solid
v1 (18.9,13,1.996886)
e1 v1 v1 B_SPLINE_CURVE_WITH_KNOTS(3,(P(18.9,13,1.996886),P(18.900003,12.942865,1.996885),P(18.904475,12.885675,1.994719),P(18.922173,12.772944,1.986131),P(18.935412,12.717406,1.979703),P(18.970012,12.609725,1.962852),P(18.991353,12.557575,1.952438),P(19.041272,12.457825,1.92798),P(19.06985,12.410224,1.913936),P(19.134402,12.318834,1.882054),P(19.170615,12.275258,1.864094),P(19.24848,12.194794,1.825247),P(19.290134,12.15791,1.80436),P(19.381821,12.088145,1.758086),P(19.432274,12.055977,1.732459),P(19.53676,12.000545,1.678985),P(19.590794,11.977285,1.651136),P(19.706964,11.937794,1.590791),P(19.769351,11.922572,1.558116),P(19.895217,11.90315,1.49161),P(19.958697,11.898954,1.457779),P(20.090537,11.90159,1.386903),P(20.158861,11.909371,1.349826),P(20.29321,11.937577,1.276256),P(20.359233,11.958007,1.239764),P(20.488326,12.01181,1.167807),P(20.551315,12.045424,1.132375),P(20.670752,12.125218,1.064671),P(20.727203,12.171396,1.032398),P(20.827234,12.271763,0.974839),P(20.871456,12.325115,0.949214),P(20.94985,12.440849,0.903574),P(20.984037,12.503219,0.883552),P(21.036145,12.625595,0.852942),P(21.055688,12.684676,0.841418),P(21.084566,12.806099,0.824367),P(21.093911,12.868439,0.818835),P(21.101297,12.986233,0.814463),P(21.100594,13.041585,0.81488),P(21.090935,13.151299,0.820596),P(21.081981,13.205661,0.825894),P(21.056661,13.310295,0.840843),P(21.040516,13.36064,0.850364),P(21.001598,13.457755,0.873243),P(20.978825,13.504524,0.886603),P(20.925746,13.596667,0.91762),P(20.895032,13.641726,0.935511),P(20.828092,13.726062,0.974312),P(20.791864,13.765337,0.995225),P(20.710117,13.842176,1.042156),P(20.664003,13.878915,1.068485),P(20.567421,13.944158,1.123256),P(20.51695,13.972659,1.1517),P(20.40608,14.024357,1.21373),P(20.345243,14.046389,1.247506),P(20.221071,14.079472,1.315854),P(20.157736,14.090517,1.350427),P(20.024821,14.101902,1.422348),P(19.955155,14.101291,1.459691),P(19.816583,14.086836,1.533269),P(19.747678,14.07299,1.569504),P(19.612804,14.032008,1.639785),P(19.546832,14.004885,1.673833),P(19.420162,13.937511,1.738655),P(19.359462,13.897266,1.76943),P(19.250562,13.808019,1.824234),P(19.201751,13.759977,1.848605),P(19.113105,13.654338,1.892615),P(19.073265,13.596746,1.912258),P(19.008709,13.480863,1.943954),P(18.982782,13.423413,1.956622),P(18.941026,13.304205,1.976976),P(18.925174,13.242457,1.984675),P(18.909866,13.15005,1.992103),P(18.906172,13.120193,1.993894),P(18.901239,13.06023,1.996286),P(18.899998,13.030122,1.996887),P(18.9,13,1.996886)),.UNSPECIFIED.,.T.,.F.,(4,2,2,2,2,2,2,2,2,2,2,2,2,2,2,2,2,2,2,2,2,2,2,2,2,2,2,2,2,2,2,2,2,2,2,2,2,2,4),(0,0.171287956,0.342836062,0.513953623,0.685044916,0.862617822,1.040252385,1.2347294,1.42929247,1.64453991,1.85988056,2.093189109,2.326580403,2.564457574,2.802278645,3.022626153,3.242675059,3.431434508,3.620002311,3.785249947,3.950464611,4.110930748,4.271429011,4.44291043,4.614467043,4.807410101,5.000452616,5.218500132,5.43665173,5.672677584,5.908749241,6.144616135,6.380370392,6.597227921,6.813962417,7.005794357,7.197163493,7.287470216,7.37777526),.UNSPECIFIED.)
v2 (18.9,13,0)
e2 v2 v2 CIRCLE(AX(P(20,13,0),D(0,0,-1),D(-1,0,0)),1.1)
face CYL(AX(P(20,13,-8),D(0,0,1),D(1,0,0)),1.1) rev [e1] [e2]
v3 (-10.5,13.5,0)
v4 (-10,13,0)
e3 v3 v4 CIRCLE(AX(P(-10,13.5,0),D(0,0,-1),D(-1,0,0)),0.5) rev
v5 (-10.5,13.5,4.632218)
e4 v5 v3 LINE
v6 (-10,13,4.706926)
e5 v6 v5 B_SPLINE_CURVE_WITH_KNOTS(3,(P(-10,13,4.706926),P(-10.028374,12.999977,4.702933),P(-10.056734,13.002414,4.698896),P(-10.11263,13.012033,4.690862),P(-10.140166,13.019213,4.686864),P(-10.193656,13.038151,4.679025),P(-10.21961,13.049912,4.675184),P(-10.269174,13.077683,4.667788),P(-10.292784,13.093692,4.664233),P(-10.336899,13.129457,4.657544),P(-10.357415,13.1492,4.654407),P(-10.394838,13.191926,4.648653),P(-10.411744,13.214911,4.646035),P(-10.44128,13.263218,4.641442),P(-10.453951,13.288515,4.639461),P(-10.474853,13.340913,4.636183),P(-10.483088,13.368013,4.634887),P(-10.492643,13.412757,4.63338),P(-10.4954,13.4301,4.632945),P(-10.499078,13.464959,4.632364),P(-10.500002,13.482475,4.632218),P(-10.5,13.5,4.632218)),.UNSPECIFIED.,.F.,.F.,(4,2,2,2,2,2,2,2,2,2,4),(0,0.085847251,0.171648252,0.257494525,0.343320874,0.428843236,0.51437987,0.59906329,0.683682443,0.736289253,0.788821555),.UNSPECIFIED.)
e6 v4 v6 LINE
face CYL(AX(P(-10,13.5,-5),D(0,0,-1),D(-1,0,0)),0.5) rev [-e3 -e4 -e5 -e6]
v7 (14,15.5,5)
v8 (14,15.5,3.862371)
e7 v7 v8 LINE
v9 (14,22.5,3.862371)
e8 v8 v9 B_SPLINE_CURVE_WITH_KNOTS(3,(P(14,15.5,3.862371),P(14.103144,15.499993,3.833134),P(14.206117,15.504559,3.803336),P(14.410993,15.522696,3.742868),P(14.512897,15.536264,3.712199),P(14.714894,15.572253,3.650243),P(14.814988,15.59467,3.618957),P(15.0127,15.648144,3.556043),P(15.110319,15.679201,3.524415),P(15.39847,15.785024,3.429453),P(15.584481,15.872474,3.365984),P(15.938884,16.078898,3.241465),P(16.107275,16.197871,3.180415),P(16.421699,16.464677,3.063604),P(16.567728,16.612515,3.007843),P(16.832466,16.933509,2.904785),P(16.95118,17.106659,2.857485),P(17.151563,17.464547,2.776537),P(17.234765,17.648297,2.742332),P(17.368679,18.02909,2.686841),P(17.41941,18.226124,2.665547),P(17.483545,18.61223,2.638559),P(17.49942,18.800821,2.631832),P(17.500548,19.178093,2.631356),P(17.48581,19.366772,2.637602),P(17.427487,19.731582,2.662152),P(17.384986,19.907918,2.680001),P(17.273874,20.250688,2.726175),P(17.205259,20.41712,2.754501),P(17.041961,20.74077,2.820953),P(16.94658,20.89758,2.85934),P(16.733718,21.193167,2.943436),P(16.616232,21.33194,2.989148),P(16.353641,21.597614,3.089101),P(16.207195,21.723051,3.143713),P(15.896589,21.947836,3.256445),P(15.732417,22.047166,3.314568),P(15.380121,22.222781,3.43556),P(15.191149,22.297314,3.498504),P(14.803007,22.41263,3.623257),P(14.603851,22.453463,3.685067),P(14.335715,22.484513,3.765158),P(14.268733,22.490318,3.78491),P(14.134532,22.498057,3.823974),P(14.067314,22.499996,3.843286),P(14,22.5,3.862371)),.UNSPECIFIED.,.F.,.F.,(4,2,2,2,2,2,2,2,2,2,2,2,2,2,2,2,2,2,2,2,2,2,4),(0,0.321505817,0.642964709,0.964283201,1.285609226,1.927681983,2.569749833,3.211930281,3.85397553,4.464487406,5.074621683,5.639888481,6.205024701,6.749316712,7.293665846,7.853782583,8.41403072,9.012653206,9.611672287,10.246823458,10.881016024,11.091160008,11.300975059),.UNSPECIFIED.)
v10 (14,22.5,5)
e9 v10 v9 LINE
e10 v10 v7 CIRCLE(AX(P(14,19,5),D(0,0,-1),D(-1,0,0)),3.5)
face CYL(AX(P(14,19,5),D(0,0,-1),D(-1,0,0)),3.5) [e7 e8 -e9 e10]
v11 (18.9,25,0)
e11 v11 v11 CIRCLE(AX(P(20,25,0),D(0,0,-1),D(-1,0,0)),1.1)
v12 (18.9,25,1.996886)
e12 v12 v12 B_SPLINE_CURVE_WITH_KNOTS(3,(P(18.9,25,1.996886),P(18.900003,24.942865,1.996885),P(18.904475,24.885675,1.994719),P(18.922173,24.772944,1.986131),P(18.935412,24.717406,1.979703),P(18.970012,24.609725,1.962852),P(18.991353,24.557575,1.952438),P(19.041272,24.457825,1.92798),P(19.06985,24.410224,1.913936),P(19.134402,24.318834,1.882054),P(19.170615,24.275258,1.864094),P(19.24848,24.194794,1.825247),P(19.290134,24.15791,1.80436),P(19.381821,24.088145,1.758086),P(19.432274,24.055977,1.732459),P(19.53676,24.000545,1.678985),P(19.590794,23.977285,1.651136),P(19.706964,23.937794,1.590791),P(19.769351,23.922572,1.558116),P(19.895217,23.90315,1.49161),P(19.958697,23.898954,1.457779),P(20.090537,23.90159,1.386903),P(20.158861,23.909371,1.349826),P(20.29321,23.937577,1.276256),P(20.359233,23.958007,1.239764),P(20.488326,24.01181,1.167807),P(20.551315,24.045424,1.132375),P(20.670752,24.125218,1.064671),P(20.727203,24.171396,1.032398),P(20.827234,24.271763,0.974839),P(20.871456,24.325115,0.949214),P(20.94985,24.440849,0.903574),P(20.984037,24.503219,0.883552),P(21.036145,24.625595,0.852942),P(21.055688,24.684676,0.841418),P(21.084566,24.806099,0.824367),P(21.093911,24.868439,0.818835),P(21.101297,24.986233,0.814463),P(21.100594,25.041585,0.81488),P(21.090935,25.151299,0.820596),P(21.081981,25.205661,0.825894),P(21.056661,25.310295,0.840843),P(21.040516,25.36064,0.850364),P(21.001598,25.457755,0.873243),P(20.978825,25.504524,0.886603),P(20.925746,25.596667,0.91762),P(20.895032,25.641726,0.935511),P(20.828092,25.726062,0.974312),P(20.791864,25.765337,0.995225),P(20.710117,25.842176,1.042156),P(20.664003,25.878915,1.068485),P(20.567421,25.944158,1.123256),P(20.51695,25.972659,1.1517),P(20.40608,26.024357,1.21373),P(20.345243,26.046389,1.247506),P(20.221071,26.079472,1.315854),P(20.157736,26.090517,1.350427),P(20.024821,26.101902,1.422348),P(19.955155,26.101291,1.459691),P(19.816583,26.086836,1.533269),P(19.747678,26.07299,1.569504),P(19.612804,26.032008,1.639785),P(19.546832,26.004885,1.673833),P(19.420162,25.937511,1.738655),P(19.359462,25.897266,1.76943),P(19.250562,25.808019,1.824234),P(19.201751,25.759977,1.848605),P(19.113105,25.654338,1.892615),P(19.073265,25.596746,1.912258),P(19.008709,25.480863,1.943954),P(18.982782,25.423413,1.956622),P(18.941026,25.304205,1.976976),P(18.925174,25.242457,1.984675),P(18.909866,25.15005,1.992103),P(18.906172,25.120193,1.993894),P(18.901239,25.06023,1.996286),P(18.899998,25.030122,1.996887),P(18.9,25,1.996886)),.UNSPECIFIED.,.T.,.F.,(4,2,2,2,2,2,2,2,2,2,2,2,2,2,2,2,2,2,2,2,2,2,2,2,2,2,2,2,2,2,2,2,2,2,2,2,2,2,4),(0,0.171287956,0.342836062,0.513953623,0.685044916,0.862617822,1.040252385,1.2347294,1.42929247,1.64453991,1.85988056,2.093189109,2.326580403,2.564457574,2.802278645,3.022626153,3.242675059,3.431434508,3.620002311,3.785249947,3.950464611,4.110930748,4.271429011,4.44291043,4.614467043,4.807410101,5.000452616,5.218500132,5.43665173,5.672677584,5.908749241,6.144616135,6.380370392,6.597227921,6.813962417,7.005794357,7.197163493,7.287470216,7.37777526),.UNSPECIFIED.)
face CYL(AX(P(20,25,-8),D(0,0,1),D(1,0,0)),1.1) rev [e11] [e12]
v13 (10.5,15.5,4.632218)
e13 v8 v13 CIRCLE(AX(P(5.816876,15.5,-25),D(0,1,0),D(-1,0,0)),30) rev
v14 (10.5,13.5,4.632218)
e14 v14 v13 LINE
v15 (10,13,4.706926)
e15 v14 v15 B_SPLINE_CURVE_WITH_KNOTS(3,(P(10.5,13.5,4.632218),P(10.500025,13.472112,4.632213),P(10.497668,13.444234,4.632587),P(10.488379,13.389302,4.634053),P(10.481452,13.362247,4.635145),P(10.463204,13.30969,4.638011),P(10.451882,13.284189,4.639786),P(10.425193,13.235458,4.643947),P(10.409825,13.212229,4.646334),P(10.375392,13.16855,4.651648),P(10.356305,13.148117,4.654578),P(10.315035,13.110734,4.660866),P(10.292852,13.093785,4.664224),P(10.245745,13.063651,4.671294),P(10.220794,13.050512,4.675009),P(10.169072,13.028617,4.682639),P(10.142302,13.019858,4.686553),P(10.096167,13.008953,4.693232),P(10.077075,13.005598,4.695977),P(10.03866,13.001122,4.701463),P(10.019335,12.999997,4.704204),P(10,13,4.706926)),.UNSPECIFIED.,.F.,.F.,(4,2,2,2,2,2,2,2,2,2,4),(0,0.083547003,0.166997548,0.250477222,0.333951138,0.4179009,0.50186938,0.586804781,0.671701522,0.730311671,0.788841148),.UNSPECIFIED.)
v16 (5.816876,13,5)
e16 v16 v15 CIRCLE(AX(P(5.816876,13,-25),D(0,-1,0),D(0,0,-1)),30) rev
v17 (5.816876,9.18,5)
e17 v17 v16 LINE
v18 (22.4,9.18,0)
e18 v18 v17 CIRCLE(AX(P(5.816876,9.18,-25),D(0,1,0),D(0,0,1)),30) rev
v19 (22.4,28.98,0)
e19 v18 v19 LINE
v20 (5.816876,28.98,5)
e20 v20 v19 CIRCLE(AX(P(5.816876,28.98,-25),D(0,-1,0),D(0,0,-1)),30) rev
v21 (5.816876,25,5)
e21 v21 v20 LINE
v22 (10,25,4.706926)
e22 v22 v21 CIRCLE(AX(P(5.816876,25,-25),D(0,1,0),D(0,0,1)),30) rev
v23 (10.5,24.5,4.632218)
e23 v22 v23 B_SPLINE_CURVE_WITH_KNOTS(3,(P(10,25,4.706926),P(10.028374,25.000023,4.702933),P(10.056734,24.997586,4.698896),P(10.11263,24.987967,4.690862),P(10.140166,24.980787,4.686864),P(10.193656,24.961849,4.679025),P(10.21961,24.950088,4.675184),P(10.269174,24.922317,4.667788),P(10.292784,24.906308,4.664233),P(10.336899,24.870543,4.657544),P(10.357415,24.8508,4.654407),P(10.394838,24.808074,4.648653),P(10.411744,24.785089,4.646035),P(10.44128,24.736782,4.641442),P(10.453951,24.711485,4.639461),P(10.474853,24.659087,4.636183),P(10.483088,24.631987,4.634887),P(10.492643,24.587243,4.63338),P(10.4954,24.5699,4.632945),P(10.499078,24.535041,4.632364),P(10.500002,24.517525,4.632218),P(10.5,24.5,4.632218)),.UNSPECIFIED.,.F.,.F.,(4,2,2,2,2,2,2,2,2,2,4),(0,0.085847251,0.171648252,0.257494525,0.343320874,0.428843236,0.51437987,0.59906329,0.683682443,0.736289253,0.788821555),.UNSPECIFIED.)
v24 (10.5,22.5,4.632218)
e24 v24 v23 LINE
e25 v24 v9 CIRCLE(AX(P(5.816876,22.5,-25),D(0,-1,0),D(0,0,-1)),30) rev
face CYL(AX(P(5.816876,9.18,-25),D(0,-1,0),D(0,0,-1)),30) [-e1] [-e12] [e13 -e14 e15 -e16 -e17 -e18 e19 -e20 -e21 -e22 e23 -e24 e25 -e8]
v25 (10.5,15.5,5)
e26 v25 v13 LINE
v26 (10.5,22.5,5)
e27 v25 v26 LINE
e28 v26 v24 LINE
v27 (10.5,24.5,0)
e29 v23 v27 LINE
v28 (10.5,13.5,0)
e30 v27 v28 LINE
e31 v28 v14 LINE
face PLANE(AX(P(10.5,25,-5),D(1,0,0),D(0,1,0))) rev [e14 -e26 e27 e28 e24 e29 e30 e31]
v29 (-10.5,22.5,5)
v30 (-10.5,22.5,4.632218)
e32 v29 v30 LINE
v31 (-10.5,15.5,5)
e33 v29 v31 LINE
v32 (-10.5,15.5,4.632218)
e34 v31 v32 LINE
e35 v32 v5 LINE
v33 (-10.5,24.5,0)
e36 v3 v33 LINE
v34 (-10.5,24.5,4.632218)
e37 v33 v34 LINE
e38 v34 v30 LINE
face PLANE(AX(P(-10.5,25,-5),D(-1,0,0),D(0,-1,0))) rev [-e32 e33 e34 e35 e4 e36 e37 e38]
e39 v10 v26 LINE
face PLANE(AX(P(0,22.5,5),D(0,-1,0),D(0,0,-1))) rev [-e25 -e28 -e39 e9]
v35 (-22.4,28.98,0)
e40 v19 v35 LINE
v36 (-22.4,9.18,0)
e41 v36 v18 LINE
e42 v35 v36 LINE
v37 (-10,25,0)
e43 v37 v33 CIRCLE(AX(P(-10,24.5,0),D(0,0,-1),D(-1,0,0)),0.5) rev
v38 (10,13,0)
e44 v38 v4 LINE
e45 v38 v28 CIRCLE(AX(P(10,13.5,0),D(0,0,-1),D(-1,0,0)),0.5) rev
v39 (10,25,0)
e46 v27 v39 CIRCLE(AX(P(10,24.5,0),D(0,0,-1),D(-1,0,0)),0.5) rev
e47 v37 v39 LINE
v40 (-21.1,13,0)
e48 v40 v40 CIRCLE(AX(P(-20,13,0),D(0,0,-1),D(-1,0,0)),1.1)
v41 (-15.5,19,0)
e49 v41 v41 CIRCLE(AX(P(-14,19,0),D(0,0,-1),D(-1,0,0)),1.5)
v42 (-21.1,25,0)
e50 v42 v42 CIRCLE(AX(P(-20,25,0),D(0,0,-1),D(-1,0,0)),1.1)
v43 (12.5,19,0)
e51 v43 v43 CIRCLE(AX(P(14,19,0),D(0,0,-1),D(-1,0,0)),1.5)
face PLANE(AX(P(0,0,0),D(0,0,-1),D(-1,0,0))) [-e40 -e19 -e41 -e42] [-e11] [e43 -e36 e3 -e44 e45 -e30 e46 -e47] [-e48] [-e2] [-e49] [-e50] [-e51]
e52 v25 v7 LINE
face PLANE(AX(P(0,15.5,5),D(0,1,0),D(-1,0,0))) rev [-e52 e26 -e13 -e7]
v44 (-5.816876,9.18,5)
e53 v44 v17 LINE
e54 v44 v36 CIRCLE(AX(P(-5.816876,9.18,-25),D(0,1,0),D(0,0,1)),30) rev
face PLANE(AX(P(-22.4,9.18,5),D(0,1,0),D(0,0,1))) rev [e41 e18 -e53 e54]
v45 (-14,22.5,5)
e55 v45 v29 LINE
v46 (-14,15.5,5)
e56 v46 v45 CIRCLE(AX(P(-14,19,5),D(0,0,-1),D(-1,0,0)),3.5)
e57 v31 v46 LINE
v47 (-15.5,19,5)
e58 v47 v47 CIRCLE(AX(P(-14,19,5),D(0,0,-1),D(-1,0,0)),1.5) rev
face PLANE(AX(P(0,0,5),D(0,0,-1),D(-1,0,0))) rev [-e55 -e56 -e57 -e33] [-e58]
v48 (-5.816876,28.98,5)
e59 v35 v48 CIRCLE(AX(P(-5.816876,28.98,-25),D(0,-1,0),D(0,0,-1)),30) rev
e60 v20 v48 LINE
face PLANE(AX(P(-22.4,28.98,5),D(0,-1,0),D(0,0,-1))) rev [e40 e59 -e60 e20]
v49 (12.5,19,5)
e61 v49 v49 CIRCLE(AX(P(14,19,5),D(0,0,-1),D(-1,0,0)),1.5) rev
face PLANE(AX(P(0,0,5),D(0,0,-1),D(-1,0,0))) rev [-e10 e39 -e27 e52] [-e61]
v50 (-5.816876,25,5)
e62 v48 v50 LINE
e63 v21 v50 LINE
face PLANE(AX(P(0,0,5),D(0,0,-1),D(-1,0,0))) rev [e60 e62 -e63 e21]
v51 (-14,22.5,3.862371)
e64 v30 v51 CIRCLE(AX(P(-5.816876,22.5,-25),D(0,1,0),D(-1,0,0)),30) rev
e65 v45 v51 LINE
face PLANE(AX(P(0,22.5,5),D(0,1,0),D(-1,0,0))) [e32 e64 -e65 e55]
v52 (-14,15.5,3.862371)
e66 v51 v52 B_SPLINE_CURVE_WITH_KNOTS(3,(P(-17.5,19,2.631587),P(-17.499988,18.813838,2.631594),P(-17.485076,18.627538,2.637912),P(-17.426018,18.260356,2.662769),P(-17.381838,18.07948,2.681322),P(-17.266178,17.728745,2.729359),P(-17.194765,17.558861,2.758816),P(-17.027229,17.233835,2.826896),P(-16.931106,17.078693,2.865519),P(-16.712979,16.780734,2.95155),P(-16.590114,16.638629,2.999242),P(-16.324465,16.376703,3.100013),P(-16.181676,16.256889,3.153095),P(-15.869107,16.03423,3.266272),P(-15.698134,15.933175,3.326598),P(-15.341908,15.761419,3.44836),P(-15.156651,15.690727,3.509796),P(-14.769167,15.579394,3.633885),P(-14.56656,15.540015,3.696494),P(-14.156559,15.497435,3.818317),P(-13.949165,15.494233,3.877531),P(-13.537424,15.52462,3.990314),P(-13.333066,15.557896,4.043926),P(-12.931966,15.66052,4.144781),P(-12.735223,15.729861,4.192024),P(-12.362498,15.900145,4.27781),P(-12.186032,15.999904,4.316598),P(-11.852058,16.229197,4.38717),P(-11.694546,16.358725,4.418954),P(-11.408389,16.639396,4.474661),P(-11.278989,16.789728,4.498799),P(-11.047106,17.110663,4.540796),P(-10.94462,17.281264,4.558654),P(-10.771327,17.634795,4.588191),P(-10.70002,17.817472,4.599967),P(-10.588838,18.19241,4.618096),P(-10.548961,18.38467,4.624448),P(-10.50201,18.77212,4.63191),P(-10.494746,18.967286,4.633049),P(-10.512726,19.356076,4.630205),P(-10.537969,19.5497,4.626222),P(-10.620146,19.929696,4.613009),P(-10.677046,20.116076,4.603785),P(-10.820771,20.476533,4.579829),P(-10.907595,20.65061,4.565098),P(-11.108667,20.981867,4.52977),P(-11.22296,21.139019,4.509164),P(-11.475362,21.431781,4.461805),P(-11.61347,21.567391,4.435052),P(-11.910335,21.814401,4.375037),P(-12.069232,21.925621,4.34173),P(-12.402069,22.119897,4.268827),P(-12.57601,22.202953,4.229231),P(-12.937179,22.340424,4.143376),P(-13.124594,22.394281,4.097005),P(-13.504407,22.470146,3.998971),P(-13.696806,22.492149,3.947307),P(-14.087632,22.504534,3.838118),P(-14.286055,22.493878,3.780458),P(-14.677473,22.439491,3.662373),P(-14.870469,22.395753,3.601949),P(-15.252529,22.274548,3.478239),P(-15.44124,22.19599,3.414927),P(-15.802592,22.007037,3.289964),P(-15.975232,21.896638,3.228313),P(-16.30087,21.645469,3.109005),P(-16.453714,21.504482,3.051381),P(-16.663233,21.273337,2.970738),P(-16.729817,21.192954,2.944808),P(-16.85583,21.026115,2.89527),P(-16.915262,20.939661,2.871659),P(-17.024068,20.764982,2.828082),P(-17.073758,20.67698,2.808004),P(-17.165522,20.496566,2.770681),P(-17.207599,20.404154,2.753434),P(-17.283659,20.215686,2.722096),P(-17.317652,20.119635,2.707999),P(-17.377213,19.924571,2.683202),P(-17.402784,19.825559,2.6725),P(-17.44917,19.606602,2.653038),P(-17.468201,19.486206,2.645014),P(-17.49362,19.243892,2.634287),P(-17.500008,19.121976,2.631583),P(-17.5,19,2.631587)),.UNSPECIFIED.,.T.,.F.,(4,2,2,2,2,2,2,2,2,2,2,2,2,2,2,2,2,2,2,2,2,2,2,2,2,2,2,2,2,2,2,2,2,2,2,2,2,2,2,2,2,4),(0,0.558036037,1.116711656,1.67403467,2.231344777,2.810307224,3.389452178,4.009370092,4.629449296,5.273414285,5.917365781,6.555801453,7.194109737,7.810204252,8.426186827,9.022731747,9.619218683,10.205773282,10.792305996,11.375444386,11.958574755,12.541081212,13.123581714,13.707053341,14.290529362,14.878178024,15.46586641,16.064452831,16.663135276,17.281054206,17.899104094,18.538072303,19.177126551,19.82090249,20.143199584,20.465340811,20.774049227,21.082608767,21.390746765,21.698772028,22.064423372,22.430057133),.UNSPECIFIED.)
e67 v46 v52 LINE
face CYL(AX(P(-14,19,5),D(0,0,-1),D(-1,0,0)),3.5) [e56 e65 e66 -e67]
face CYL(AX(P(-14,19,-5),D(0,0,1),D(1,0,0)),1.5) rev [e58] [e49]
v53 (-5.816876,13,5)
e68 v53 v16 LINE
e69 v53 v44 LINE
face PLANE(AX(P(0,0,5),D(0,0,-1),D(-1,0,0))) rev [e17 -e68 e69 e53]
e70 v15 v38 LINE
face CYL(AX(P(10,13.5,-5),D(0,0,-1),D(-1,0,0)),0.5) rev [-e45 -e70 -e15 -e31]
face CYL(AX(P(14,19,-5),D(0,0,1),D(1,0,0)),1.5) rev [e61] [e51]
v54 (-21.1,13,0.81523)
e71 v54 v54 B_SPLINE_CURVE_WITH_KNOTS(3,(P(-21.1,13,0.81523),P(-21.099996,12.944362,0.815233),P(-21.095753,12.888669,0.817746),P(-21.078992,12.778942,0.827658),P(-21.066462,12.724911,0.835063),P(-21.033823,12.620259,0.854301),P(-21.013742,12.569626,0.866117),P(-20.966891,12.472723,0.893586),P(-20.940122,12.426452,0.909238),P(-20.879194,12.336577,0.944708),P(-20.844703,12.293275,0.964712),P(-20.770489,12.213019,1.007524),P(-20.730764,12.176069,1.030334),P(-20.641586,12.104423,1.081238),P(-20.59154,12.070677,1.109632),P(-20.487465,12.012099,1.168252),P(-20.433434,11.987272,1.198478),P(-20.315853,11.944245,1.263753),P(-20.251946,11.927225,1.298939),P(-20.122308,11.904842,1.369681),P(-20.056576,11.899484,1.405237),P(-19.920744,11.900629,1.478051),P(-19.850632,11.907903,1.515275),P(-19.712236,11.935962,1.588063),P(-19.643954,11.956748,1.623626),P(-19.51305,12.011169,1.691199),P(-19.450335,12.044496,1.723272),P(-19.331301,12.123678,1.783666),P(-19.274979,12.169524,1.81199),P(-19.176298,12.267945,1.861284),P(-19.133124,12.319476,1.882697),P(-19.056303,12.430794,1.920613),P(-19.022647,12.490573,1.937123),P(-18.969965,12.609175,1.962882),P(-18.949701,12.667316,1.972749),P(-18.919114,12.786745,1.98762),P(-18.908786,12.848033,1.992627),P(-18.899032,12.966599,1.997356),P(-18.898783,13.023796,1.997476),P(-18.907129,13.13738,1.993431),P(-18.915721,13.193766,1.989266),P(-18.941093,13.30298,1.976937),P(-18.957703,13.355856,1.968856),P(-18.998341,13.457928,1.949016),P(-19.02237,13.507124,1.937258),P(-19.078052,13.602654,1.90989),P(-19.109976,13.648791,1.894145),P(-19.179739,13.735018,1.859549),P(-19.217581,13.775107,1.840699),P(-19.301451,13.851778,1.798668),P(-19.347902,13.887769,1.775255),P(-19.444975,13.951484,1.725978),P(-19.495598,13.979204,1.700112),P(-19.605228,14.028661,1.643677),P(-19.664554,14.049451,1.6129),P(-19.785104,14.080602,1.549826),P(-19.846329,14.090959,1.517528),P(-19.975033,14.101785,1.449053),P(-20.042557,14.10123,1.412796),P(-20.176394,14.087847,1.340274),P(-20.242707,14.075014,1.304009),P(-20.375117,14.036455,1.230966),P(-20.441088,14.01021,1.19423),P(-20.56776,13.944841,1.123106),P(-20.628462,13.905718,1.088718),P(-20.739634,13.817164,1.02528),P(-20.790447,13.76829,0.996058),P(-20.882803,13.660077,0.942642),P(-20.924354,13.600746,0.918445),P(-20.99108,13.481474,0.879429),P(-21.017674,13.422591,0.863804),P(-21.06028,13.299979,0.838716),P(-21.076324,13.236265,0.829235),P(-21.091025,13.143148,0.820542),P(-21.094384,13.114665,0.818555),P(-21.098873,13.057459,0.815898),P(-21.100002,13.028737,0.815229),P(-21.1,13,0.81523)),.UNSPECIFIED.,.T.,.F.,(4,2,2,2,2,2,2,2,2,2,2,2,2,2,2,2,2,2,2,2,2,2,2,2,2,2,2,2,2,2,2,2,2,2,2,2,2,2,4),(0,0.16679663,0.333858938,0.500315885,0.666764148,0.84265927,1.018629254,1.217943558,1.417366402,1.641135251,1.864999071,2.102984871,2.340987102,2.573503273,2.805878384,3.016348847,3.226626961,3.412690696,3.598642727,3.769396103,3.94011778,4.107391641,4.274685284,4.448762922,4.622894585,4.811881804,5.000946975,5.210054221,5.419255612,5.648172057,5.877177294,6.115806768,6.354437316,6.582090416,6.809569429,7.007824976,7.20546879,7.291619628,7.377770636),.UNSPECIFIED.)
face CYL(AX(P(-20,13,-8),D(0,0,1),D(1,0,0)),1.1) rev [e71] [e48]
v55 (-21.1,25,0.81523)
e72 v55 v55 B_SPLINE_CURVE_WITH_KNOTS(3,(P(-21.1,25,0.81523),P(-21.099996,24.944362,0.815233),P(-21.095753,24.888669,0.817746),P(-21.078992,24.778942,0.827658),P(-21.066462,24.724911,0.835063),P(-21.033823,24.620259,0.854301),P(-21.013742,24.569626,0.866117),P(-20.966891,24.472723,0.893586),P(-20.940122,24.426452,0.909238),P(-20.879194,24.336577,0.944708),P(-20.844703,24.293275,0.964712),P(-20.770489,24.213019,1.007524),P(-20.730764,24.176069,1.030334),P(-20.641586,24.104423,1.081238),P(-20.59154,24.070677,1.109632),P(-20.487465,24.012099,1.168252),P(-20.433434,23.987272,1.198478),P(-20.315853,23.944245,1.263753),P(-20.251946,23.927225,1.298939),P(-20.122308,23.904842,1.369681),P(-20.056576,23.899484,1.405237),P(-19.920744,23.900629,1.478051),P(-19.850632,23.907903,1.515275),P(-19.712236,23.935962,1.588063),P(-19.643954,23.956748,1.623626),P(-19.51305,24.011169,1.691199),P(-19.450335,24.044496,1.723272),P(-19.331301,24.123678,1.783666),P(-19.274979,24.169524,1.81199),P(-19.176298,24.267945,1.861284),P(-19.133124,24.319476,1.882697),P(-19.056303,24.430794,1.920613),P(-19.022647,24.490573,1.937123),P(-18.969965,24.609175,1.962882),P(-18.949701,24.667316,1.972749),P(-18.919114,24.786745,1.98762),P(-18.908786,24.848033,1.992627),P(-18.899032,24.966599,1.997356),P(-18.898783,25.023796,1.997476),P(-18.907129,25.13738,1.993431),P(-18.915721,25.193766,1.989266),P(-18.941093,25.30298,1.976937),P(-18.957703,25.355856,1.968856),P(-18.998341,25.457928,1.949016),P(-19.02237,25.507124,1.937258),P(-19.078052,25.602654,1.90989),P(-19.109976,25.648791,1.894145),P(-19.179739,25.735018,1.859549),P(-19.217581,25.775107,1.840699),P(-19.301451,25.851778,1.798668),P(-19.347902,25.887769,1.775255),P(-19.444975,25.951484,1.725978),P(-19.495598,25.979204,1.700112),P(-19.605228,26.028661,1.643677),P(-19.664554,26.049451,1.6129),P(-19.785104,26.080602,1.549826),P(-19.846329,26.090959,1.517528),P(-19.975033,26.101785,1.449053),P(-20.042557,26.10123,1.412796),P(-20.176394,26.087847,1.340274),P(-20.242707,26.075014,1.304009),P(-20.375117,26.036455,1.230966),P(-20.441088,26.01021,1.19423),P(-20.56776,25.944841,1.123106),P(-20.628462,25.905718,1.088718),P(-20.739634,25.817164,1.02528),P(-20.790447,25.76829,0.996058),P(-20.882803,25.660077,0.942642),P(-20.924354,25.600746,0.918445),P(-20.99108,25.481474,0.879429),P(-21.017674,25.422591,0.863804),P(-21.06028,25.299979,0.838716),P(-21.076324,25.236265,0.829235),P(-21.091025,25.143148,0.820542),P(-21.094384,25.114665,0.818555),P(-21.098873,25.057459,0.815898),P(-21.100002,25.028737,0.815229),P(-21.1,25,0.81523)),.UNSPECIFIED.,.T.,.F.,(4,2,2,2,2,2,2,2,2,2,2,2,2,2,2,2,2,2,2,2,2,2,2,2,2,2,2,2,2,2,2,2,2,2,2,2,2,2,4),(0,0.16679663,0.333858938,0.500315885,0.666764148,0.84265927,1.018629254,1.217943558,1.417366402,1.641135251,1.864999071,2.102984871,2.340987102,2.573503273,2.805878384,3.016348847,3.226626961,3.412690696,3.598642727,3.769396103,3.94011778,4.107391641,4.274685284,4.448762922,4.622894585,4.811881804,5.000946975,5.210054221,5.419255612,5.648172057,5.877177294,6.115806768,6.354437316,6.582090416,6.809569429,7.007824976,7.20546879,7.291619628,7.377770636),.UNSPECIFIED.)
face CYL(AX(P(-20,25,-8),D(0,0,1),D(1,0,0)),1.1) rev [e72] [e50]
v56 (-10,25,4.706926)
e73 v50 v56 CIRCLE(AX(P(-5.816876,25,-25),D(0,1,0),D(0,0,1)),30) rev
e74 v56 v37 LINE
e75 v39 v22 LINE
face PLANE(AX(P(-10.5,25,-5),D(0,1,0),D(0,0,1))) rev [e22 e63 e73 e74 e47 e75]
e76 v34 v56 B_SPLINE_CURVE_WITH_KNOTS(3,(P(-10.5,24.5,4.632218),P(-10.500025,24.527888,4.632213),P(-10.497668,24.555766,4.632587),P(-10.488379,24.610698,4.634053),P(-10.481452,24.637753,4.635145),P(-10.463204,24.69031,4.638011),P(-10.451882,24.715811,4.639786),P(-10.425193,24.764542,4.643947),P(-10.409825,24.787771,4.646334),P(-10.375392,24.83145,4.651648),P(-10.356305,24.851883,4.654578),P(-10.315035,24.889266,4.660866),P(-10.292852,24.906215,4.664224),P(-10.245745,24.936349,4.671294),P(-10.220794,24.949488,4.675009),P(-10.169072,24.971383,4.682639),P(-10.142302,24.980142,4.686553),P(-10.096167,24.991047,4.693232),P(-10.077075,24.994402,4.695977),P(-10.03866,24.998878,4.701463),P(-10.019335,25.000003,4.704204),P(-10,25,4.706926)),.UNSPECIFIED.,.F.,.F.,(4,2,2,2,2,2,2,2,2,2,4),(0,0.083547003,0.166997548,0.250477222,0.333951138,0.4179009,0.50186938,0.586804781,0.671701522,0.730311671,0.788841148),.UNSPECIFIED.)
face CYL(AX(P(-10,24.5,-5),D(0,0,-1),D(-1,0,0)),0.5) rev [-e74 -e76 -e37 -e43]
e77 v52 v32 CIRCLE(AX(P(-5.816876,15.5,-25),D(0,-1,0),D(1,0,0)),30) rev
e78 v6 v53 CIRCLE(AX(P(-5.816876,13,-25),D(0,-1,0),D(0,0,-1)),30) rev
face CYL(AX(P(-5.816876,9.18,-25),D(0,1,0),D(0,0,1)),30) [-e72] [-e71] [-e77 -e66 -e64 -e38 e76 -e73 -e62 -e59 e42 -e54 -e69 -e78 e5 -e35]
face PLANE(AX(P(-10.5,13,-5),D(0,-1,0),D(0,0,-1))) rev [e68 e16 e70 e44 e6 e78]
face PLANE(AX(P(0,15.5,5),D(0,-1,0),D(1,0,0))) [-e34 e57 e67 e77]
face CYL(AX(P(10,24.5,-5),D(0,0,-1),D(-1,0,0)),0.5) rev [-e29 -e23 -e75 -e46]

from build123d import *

# Parameters (mm, degrees)
SKETCH1_W           = 44.8
SKETCH1_H           = 19.8
BOSS_EXTRUDE1_DEPTH = 5
SKETCH2_R           = 1.1
CUT_EXTRUDE1_DEPTH  = 13
SKETCH3_R           = 1.5
CUT_EXTRUDE2_DEPTH  = 10
SKETCH4_W           = 21
SKETCH4_H           = 12
CUT_EXTRUDE3_DEPTH  = 10
FILLET1_START       = 9.18
FILLET1_DEPTH       = 19.8
BOSS_EXTRUDE2_START = -5
SKETCH5_R           = 3.5
SKETCH5_R_2         = 1.5
BOSS_EXTRUDE2_DEPTH = 5
FILLET2_R           = 0.5


with BuildPart() as part:
    # Sketch1 → Boss-Extrude1 (new body)
    with BuildSketch(Plane.XY):
        with Locations((0, 19.08)):
            Rectangle(SKETCH1_W, SKETCH1_H)
    extrude(amount=BOSS_EXTRUDE1_DEPTH)

    # Sketch2 → Cut-Extrude1 (cut)
    with BuildSketch(Plane.XY.offset(5)):
        with Locations((-20, 25)):
            Circle(SKETCH2_R)
        with Locations((-20, 13)):
            Circle(SKETCH2_R)
        with Locations((20, 25)):
            Circle(SKETCH2_R)
        with Locations((20, 13)):
            Circle(SKETCH2_R)
    extrude(amount=-CUT_EXTRUDE1_DEPTH, mode=Mode.SUBTRACT)

    # Sketch3 → Cut-Extrude2 (cut)
    with BuildSketch(Plane.XY.offset(5)):
        with Locations((-14, 19)):
            Circle(SKETCH3_R)
        with Locations((14, 19)):
            Circle(SKETCH3_R)
    extrude(amount=-CUT_EXTRUDE2_DEPTH, mode=Mode.SUBTRACT)

    # Sketch4 → Cut-Extrude3 (cut)
    with BuildSketch(Plane.XY.offset(5)):
        with Locations((0, 19)):
            Rectangle(SKETCH4_W, SKETCH4_H)
    extrude(amount=-CUT_EXTRUDE3_DEPTH, mode=Mode.SUBTRACT)

    # Fillet1: read off the stored shape, not the designer's step
    # Fillet1 outline → Fillet1 (cut)
    with BuildSketch(Plane(origin=(0, 0, 0), x_dir=(1, 0, 0), z_dir=(0, 1, 0)).offset(FILLET1_START)):
        with BuildLine():
            Line((22.4, -5), (22.4, 0))
            ThreePointArc((22.4, 0), (14.477130086, -3.722813233), (5.816876048, -5))
            Line((5.816876048, -5), (22.4, -5))
        make_face()
        with BuildLine():
            Line((-22.4, -5), (-5.816876048, -5))
            ThreePointArc((-5.816876048, -5), (-14.477130086, -3.722813233), (-22.4, 0))
            Line((-22.4, 0), (-22.4, -5))
        make_face()
    extrude(amount=FILLET1_DEPTH, mode=Mode.SUBTRACT)

    # Sketch5 → Boss-Extrude2 (add)
    # profile 1 of 6: a face of its own
    with BuildSketch(Plane(origin=(0, 0, 0), x_dir=(-1, 0, 0), z_dir=(0, 0, -1)).offset(BOSS_EXTRUDE2_START)):
        with Locations((-14, 19)):
            Circle(SKETCH5_R)
        with Locations((-14, 19)):
            Circle(SKETCH5_R_2, mode=Mode.SUBTRACT)
    # profile 2 of 6: a face of its own
    with BuildSketch(Plane(origin=(0, 0, 0), x_dir=(-1, 0, 0), z_dir=(0, 0, -1)).offset(BOSS_EXTRUDE2_START)):
        with BuildLine():
            Line((-10.5, 22.5), (-14, 22.5))
            ThreePointArc((-14, 22.5), (-11.525126266, 21.474873734), (-10.5, 19))
            Line((-10.5, 19), (-10.5, 22.5))
        make_face()
    # profile 3 of 6: a face of its own
    with BuildSketch(Plane(origin=(0, 0, 0), x_dir=(-1, 0, 0), z_dir=(0, 0, -1)).offset(BOSS_EXTRUDE2_START)):
        with BuildLine():
            Line((-10.5, 15.5), (-10.5, 19))
            ThreePointArc((-10.5, 19), (-11.525126266, 16.525126266), (-14, 15.5))
            Line((-14, 15.5), (-10.5, 15.5))
        make_face()
    # profile 4 of 6: a face of its own
    with BuildSketch(Plane(origin=(0, 0, 0), x_dir=(-1, 0, 0), z_dir=(0, 0, -1)).offset(BOSS_EXTRUDE2_START)):
        with Locations((14, 19)):
            Circle(SKETCH5_R)
        with Locations((14, 19)):
            Circle(SKETCH5_R_2, mode=Mode.SUBTRACT)
    # profile 5 of 6: a face of its own
    with BuildSketch(Plane(origin=(0, 0, 0), x_dir=(-1, 0, 0), z_dir=(0, 0, -1)).offset(BOSS_EXTRUDE2_START)):
        with BuildLine():
            ThreePointArc((14, 15.5), (11.525126266, 16.525126266), (10.5, 19))
            Line((10.5, 19), (10.5, 15.5))
            Line((10.5, 15.5), (14, 15.5))
        make_face()
    # profile 6 of 6: a face of its own
    with BuildSketch(Plane(origin=(0, 0, 0), x_dir=(-1, 0, 0), z_dir=(0, 0, -1)).offset(BOSS_EXTRUDE2_START)):
        with BuildLine():
            ThreePointArc((10.5, 19), (11.525126266, 21.474873734), (14, 22.5))
            Line((14, 22.5), (10.5, 22.5))
            Line((10.5, 22.5), (10.5, 19))
        make_face()
    extrude(amount=BOSS_EXTRUDE2_DEPTH)

    # Fillet2
    fillet2_edges = [part.edges().sort_by_distance(p)[0] for p in [
        (-10.5, 13, 2.316109055),
        (-10.5, 25, 2.316109055),
        (10.5, 25, 2.316109055),
        (10.5, 13, 2.316109055),
    ]]
    fillet(fillet2_edges, radius=FILLET2_R)


solid = part.part
